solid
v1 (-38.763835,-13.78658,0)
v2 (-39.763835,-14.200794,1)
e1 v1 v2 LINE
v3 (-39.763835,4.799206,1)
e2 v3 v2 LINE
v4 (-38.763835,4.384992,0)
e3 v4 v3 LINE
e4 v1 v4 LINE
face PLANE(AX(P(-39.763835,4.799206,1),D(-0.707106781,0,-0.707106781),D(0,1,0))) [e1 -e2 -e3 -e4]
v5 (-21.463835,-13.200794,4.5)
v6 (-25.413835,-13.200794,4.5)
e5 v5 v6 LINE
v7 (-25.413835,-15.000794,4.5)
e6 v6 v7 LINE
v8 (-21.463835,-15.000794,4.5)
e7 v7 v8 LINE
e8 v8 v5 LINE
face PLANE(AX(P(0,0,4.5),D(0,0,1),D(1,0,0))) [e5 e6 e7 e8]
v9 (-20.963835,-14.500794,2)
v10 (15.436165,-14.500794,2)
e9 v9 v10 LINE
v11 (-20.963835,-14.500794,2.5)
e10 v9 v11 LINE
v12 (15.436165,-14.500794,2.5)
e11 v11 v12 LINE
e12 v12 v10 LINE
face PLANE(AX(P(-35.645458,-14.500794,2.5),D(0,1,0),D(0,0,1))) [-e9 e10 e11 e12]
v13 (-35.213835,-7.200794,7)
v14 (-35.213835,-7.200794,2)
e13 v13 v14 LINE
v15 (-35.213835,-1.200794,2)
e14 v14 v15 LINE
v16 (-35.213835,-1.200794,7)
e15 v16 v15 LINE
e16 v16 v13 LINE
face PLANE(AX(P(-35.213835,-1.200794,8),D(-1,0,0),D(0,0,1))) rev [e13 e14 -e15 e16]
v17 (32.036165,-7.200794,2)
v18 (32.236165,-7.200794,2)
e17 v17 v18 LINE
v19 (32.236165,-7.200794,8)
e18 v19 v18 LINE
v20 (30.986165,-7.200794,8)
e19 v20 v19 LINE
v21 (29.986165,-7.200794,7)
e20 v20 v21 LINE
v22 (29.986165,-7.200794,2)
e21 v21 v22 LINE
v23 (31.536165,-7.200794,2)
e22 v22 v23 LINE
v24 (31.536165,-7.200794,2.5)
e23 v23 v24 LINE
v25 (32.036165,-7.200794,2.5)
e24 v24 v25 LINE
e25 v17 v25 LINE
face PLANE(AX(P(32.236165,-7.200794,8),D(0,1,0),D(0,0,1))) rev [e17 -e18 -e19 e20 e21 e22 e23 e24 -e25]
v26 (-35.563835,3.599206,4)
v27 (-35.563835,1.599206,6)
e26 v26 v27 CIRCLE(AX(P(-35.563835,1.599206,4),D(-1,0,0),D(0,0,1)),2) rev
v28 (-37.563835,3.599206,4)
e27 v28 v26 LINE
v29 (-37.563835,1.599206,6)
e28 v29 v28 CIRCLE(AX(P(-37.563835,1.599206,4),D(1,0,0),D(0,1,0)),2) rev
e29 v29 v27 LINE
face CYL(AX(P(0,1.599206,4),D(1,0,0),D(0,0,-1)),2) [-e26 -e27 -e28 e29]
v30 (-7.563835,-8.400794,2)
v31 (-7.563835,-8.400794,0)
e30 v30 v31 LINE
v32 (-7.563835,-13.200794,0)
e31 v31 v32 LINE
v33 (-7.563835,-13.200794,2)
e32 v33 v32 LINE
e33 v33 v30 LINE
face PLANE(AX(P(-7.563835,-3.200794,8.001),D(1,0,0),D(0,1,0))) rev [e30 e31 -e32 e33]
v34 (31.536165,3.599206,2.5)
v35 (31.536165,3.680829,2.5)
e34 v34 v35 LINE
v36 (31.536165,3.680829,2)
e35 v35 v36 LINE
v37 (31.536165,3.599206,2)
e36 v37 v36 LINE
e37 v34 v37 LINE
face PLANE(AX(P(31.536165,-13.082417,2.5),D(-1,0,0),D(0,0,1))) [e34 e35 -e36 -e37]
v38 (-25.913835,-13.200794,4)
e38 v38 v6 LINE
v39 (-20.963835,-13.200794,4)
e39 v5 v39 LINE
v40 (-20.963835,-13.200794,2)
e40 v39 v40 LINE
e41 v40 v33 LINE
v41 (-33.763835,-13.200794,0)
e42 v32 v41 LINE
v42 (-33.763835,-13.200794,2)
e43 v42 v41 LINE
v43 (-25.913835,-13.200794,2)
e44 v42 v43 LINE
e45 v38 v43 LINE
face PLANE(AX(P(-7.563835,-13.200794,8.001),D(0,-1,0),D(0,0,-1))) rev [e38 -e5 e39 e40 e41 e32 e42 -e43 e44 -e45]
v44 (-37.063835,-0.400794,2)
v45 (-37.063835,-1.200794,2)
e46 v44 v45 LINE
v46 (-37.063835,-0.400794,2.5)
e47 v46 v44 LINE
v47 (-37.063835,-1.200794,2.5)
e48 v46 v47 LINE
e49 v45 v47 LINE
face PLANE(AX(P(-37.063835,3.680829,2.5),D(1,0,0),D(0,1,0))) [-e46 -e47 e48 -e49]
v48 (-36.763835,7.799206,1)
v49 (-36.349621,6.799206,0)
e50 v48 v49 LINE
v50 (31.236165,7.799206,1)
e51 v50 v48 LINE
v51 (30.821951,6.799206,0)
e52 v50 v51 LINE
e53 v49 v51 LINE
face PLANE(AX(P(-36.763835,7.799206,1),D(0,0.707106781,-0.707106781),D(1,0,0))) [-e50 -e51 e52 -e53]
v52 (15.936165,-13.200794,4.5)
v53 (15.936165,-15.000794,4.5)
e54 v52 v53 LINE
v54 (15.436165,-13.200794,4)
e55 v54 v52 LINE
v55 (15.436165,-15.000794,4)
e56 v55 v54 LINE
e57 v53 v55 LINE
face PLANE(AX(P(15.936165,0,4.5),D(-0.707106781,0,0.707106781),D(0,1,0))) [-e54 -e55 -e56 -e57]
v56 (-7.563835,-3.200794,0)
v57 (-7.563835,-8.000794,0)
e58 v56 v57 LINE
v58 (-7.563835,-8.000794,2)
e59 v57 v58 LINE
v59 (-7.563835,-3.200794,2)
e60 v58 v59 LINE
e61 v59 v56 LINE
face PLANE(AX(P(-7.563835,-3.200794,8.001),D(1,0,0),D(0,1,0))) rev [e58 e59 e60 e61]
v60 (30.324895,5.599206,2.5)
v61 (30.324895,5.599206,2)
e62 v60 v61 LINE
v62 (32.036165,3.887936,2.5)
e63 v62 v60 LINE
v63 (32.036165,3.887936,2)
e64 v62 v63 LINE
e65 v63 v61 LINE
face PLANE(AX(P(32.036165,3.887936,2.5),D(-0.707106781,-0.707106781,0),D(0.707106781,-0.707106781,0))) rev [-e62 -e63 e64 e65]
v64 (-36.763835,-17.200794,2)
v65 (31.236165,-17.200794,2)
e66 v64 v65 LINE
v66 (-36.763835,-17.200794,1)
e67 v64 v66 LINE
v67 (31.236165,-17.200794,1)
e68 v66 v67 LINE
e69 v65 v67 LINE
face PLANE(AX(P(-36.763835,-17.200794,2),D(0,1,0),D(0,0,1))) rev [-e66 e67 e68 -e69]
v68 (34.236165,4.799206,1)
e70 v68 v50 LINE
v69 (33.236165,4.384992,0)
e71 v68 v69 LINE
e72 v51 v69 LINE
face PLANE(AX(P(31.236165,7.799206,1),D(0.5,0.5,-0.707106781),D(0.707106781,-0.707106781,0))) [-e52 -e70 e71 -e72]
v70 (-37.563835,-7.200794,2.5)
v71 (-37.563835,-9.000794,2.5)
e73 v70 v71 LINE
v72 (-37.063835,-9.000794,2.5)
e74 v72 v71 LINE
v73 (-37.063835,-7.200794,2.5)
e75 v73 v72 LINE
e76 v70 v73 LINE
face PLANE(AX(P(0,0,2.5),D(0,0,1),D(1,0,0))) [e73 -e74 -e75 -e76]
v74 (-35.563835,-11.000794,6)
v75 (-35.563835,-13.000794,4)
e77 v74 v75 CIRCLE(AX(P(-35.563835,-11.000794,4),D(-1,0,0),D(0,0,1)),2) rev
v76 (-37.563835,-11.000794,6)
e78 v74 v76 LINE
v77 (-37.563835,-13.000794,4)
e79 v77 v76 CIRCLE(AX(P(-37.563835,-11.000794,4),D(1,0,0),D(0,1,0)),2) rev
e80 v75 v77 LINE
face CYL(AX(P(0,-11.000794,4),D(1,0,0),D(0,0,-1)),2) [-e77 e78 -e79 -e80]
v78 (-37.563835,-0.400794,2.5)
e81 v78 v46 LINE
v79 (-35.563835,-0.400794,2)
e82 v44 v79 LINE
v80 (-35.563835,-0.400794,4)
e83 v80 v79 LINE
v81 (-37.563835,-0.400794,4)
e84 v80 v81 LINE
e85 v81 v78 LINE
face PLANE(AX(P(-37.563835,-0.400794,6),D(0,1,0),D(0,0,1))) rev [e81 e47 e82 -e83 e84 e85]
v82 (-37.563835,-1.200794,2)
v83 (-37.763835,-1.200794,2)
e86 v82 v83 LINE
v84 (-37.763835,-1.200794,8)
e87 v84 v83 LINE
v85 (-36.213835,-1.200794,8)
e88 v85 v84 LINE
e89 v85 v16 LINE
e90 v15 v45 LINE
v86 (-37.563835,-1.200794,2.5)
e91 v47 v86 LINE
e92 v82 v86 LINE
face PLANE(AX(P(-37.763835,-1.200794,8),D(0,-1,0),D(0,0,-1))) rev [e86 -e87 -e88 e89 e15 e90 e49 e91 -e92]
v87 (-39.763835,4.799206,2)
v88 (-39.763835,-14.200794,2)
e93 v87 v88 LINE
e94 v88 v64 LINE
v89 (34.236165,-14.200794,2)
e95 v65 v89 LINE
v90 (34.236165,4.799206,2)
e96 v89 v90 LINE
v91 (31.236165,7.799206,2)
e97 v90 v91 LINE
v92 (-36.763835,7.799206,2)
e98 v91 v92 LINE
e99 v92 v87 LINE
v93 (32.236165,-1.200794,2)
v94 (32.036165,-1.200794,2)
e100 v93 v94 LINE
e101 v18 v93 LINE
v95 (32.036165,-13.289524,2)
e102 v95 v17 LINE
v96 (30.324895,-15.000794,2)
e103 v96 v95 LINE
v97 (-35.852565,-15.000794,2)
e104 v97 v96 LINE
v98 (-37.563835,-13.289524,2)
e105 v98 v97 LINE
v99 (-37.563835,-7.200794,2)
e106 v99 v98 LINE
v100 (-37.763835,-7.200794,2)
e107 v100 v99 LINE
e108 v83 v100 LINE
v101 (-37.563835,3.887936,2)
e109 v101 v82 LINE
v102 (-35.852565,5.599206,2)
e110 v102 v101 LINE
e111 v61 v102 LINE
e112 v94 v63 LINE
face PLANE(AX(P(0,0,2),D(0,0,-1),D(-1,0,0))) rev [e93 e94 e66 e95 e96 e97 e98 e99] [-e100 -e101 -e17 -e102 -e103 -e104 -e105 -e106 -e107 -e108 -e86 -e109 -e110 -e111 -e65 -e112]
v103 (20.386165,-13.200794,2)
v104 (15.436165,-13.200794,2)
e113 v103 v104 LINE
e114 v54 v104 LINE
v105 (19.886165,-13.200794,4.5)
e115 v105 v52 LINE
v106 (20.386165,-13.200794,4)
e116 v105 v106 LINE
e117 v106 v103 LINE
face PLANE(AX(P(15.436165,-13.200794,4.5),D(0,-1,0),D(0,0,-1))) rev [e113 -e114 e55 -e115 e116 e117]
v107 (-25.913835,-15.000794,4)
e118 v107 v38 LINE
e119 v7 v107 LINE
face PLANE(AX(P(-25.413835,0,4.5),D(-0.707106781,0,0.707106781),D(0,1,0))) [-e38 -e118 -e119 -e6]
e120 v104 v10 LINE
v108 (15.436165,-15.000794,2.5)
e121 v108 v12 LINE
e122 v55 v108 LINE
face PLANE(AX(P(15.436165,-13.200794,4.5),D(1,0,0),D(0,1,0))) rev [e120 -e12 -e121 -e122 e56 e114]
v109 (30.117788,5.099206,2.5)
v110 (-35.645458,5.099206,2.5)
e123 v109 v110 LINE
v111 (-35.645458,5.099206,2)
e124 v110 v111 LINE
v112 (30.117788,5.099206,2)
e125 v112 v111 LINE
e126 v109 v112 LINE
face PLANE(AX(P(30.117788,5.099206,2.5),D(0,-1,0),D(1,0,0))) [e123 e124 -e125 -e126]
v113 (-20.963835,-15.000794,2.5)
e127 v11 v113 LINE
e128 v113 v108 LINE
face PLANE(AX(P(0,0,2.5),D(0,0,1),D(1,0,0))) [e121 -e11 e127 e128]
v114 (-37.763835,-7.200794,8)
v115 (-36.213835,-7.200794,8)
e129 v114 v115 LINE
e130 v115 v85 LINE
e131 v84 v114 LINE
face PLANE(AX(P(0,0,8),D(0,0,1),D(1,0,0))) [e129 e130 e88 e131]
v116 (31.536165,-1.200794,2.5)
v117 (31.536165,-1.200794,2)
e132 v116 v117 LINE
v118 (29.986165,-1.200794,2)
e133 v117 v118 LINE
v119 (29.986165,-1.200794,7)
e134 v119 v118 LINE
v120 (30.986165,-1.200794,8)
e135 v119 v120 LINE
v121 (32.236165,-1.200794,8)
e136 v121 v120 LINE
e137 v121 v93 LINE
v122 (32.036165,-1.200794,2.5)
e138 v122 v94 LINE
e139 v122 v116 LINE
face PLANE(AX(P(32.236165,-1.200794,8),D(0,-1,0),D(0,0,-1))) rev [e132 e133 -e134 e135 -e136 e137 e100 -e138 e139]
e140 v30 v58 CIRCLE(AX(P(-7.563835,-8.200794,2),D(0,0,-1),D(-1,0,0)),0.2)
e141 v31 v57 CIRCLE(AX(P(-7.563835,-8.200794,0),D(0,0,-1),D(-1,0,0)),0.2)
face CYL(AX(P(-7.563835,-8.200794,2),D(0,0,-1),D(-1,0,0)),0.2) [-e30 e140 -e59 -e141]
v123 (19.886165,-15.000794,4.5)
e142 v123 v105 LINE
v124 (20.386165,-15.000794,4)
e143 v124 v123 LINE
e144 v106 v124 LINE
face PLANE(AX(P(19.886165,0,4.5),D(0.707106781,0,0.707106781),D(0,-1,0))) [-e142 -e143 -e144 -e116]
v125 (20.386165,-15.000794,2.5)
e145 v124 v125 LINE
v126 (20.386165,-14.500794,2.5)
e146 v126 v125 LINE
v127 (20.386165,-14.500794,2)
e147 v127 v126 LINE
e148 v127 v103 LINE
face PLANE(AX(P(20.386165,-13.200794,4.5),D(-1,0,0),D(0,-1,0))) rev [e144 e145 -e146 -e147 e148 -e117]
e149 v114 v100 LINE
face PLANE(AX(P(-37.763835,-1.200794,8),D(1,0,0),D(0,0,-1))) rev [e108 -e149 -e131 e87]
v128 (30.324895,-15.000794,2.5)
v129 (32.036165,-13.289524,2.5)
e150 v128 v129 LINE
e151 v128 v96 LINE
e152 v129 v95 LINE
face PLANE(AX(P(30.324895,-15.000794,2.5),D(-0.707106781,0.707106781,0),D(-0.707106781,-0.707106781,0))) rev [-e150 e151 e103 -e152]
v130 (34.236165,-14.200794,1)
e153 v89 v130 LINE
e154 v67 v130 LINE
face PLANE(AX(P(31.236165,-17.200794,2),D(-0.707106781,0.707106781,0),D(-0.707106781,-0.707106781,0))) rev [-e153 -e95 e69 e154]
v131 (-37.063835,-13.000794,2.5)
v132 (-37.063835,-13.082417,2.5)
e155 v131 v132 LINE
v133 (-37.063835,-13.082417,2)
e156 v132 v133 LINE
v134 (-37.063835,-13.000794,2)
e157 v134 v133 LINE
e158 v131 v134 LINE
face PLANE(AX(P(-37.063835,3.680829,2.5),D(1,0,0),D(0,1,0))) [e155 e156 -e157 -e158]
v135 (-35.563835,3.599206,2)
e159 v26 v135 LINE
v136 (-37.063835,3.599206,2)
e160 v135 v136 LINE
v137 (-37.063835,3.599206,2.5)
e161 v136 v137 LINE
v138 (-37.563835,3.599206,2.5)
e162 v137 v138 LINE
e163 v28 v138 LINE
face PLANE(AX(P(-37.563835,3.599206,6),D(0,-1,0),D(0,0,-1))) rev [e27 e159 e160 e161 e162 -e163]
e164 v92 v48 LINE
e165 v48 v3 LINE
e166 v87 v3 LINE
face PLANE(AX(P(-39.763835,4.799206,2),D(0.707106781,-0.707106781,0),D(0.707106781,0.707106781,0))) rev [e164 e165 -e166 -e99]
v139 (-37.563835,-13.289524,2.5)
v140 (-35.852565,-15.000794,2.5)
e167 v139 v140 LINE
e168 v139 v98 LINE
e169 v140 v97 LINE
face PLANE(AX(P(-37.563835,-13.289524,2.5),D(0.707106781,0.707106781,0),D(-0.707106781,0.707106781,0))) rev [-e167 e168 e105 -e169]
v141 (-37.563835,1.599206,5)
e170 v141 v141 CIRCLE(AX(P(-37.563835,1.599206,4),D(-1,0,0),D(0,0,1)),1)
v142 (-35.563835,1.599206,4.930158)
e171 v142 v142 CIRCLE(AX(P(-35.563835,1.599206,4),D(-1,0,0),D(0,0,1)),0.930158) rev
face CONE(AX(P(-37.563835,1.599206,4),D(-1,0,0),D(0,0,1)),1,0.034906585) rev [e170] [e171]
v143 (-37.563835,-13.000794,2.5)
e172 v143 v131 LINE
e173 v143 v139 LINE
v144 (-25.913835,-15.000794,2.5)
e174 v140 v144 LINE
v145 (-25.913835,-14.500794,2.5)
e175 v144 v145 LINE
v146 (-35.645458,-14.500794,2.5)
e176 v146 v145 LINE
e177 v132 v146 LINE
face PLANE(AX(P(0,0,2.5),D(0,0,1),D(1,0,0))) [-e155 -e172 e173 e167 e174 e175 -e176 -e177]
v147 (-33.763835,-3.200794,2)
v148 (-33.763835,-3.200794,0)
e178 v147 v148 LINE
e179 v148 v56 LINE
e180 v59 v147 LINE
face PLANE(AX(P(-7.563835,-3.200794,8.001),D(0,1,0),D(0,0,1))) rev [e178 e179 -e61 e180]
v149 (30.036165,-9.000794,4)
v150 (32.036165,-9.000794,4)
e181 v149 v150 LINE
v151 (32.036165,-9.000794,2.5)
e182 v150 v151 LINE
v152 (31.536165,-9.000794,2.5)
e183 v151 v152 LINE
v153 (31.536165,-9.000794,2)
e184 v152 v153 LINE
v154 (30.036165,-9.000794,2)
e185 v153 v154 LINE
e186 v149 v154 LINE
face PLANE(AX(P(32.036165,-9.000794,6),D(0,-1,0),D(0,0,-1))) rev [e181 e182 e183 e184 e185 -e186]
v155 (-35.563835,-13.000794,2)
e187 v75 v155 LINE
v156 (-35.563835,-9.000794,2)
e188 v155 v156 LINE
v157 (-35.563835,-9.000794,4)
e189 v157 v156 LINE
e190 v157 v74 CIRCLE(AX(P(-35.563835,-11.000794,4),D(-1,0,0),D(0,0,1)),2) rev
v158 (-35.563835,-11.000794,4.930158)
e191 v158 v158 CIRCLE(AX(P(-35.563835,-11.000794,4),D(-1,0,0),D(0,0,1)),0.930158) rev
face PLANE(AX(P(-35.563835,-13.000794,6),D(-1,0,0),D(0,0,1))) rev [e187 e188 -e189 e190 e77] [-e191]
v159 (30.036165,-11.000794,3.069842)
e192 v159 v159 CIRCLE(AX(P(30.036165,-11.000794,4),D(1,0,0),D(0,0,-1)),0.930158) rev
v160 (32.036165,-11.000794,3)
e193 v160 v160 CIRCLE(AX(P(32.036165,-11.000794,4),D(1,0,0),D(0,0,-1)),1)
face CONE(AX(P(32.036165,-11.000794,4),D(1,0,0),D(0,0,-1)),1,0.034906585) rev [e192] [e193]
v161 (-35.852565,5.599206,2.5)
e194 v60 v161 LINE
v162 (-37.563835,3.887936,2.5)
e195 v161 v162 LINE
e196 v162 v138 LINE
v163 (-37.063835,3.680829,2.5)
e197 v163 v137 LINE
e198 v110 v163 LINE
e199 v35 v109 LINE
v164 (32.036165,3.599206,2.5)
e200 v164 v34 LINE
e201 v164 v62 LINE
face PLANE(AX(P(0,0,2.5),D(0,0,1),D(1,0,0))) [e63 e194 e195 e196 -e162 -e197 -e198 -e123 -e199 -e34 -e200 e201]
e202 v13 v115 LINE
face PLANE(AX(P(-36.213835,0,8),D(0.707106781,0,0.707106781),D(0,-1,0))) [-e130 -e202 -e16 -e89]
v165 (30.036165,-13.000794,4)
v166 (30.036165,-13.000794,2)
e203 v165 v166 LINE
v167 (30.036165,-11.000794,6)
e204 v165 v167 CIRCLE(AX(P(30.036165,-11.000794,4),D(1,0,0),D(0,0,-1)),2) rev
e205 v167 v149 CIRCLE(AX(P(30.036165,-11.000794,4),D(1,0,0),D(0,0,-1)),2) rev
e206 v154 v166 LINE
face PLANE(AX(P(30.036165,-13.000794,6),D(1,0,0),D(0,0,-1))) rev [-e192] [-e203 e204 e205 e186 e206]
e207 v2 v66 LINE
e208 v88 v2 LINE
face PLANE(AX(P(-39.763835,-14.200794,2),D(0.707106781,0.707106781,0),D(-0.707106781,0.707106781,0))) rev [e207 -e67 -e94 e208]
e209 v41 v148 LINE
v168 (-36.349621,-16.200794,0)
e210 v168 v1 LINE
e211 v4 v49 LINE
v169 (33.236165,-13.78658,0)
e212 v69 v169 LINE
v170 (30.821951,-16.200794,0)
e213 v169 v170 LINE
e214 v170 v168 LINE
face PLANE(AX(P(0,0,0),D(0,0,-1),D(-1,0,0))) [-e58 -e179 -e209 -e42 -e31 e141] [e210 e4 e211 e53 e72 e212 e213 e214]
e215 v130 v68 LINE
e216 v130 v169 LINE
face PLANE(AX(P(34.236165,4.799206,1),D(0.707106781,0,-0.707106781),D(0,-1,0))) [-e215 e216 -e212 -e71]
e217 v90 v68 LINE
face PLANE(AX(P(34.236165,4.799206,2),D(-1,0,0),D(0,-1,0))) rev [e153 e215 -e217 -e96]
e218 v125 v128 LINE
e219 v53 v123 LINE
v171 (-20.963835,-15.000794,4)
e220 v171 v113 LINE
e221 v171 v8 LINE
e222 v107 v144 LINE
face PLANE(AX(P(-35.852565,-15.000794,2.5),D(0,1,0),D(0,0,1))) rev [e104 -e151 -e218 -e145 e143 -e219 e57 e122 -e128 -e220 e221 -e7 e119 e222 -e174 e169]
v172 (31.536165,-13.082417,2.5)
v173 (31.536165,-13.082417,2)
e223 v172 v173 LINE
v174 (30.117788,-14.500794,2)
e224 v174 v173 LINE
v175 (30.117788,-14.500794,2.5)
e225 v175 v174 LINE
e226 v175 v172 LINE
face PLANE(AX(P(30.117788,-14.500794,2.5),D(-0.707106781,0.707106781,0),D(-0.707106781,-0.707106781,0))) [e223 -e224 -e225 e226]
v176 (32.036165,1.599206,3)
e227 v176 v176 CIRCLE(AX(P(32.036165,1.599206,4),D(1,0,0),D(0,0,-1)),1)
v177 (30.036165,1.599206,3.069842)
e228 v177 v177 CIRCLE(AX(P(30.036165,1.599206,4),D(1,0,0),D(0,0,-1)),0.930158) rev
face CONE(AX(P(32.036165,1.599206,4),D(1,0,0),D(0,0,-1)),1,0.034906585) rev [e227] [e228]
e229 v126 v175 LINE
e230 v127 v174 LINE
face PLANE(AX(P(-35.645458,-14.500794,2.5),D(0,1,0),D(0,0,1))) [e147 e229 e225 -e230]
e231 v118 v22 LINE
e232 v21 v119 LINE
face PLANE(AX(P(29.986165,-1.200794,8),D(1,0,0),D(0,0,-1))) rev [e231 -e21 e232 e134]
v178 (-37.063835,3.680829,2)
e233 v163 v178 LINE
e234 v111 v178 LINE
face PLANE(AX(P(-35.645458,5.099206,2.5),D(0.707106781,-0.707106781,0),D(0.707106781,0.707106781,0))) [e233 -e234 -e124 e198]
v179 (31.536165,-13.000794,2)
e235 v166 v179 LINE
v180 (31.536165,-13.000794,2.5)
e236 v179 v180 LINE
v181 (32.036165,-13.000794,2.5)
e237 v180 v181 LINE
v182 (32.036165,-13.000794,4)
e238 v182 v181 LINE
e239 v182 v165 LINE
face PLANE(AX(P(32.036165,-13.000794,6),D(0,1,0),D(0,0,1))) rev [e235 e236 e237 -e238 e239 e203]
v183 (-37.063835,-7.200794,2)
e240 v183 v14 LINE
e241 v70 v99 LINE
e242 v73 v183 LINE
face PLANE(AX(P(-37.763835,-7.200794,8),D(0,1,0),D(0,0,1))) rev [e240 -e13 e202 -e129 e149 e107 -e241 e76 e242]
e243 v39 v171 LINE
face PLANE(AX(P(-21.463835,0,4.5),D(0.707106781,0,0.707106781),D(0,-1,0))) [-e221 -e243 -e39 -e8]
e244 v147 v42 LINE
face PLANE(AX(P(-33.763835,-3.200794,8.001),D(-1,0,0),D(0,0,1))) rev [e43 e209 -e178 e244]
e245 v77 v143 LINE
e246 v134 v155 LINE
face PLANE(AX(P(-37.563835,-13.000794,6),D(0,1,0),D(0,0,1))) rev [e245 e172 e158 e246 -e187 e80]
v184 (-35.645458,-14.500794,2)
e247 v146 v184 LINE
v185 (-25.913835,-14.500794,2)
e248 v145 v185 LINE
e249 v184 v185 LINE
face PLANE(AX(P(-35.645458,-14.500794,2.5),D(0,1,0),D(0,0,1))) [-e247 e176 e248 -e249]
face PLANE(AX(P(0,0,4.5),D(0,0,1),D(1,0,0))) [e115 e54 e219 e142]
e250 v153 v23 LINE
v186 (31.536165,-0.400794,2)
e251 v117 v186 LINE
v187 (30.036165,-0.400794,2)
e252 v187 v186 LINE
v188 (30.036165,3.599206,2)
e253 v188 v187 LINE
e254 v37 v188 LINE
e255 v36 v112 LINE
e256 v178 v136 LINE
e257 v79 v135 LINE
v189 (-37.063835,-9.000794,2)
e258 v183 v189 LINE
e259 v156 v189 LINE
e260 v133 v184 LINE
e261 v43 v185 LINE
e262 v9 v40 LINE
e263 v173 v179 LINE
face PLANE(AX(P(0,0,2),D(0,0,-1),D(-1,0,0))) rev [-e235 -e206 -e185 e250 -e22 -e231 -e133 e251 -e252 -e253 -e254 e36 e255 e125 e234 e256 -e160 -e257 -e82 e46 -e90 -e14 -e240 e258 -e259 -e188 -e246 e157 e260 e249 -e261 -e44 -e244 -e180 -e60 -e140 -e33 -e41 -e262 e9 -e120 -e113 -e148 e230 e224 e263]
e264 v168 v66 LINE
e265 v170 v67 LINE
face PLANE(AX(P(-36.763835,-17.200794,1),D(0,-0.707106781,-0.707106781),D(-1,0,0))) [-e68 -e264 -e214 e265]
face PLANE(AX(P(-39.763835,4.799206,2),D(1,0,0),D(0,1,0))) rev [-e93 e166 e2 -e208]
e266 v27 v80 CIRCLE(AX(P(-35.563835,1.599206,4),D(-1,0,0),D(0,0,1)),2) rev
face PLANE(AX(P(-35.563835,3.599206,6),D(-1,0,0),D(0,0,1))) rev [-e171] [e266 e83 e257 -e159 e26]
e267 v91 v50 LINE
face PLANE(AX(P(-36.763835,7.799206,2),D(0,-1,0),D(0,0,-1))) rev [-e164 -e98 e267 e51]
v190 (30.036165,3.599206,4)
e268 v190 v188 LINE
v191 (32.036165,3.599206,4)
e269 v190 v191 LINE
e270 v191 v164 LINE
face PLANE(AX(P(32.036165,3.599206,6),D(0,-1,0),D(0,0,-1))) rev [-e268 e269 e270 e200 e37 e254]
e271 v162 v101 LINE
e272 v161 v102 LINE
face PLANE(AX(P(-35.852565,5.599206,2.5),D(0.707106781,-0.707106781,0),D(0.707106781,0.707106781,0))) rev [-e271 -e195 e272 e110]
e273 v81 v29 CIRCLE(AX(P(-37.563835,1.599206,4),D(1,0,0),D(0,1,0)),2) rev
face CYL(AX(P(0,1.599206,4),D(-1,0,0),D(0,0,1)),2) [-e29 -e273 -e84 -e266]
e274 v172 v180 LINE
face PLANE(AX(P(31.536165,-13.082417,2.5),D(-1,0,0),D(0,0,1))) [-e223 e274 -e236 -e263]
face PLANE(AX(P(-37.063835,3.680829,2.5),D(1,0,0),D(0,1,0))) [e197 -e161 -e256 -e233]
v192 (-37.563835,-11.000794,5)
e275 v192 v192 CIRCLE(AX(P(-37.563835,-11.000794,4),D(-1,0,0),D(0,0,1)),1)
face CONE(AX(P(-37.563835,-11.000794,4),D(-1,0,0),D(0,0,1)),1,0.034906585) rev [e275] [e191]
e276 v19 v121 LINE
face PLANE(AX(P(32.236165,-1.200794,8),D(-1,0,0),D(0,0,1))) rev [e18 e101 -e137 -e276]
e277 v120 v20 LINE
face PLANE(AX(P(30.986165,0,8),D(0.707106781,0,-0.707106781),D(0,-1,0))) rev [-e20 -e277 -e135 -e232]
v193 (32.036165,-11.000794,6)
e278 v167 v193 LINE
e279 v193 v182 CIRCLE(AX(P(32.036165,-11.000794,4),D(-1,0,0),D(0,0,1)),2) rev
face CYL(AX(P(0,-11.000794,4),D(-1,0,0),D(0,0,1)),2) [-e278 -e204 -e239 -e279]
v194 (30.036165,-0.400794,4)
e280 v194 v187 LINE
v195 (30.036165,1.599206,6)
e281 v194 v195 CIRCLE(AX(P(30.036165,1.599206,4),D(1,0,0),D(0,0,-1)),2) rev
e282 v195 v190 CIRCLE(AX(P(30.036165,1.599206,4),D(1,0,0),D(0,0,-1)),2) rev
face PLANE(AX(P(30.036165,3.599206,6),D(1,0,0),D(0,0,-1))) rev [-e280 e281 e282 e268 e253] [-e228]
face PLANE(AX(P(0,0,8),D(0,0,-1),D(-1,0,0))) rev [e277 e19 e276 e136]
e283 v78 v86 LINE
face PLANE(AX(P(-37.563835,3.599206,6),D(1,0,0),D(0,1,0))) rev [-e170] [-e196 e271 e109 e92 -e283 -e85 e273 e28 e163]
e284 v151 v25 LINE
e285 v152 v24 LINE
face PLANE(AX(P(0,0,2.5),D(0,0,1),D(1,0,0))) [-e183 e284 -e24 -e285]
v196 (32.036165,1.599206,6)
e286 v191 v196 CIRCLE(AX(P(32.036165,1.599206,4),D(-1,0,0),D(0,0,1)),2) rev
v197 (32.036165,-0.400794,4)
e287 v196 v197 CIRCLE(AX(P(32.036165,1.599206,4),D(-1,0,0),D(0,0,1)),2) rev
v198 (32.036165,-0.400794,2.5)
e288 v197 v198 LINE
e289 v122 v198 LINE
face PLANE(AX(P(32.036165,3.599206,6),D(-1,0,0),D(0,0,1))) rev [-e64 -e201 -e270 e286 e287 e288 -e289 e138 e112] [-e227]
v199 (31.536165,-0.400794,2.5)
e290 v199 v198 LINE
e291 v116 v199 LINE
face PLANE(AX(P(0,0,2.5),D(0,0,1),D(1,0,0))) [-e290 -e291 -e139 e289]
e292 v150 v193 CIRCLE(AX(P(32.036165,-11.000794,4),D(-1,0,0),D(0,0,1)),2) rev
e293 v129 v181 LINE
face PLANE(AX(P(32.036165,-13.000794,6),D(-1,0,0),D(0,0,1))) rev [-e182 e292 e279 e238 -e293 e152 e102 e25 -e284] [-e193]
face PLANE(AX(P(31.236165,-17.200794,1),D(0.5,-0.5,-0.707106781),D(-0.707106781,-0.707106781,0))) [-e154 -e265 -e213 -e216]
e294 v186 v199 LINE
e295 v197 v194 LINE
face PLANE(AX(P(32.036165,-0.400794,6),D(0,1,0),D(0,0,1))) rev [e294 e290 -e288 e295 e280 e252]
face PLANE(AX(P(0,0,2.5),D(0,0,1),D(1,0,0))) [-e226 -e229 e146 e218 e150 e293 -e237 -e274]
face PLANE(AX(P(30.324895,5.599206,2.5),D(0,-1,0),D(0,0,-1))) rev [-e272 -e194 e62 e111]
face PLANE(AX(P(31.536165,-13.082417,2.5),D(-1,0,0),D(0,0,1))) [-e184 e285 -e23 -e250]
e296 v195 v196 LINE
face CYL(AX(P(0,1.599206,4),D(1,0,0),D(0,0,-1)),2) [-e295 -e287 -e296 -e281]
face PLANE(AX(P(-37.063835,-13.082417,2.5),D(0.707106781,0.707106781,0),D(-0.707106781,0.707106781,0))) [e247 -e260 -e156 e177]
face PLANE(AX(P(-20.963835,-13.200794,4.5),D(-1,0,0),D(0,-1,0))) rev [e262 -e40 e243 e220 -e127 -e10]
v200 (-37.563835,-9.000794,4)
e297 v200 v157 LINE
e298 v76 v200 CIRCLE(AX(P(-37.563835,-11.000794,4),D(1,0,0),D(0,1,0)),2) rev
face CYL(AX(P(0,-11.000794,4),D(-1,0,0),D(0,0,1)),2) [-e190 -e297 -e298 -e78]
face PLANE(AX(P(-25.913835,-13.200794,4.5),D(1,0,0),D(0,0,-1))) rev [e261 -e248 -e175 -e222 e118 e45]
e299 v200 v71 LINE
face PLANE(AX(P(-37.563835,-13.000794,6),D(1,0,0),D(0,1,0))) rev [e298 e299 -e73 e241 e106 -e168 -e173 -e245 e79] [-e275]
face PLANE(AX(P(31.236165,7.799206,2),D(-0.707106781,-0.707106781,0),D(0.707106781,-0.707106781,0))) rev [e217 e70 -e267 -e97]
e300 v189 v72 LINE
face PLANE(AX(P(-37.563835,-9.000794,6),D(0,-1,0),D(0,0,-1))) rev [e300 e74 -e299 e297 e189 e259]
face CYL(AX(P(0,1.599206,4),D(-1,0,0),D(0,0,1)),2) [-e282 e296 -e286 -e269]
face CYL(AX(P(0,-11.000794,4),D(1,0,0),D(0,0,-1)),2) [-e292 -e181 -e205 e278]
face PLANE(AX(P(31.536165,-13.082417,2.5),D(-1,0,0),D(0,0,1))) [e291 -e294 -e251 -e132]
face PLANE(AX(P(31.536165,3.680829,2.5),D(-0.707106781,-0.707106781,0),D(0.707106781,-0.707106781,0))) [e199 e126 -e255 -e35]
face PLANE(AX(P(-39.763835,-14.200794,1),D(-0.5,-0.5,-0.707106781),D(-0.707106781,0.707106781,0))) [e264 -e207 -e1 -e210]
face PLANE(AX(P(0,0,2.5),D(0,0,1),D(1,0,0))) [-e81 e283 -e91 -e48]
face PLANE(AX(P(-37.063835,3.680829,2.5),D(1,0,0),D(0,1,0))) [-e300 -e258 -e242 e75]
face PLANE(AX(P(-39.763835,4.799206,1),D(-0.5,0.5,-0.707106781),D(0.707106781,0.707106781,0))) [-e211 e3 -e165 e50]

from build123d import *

# Parameters (mm, degrees)
EXTRUDE_1_DEPTH               = 2
CHAMFER_1_SIZE                = 1
SKETCH_3_W                    = 2
SKETCH_3_H                    = 4
EXTRUDE_2_DEPTH               = 4
FILLET_1_R                    = 2
SKETCH_4_R                    = 1
CUT_EXTRUDE_1_DEPTH           = 2
CUT_EXTRUDE_1_DRAFT           = -2
CUT_EXTRUDE_1_PROFILE_2_DEPTH = 2
CUT_EXTRUDE_1_PROFILE_2_DRAFT = -2
SKETCH_5_R                    = 1
CUT_EXTRUDE_2_DEPTH           = 2
CUT_EXTRUDE_2_DRAFT           = -2
CUT_EXTRUDE_2_PROFILE_2_DEPTH = 2
CUT_EXTRUDE_2_PROFILE_2_DRAFT = -2
SKETCH_8_W                    = 2.55
SKETCH_8_H                    = 6
SKETCH_8_W_2                  = 2.25
EXTRUDE_5_DEPTH               = 6
CHAMFER_3_SIZE                = 1
CUT_EXTRUDE_3_REACH           = 46.057
SKETCH_10_W                   = 26.2
SKETCH_10_H                   = 10
EXTRUDE_7_DEPTH               = 0.5
SKETCH_12_W                   = 4.95
SKETCH_12_H                   = 1.8
EXTRUDE_8_DEPTH               = 2.5
CHAMFER_4_SIZE                = 0.5
SKETCH_13_R                   = 0.2
EXTRUDE_9_DEPTH               = 2


with BuildPart() as part:
    # 草图1 → 凸台-拉伸1 (new body)
    with BuildSketch(Plane.XY):
        Polygon((-39.76383505, 4.799206062), (-36.76383505, 7.799206062), (31.23616495, 7.799206062), (34.23616495, 4.799206062), (34.23616495, -14.200793938), (31.23616495, -17.200793938), (-36.76383505, -17.200793938), (-39.76383505, -14.200793938), align=None)
    extrude(amount=EXTRUDE_1_DEPTH)

    # 倒角1
    chamfer_1_edges = [part.edges().sort_by_distance(p)[0] for p in [
        (-38.26383505, -15.700793938, 0),
        (-39.76383505, -4.700793938, 0),
        (-38.26383505, 6.299206062, 0),
        (-2.76383505, 7.799206062, 0),
        (32.73616495, 6.299206062, 0),
        (34.23616495, -4.700793938, 0),
        (32.73616495, -15.700793938, 0),
        (-2.76383505, -17.200793938, 0),
    ]]
    chamfer(chamfer_1_edges, length=CHAMFER_1_SIZE)

    # 草图3 → 凸台-拉伸2 (add)
    with BuildSketch(Plane.XY.offset(2)):
        with Locations((-36.56383505, 1.599206062)):
            Rectangle(SKETCH_3_W, SKETCH_3_H)
        with Locations((-36.56383505, -11.000793938)):
            Rectangle(SKETCH_3_W, SKETCH_3_H)
        with Locations((31.03616495, 1.599206062)):
            Rectangle(SKETCH_3_W, SKETCH_3_H)
        with Locations((31.03616495, -11.000793938)):
            Rectangle(SKETCH_3_W, SKETCH_3_H)
    extrude(amount=EXTRUDE_2_DEPTH)

    # 圆角1
    fillet_1_edges = [part.edges().sort_by_distance(p)[0] for p in [
        (31.03616495, 3.599206062, 6),
        (31.03616495, -0.400793938, 6),
        (31.03616495, -9.000793938, 6),
        (31.03616495, -13.000793938, 6),
        (-36.56383505, -13.000793938, 6),
        (-36.56383505, -9.000793938, 6),
        (-36.56383505, 3.599206062, 6),
        (-36.56383505, -0.400793938, 6),
    ]]
    fillet(fillet_1_edges, radius=FILLET_1_R - 0.0001)  # a hair under: the kernel refuses the full size


with BuildPart() as cut_extrude_1_tool:
    # 草图4 → 切除-拉伸1 (with draft: the straight prism first)
    with BuildSketch(Plane(origin=(32.03616495, 0, 0), x_dir=(0, 0, -1), z_dir=(1, 0, 0))):
        with Locations((-4, 1.599206062)):
            Circle(SKETCH_4_R)
    extrude(amount=-CUT_EXTRUDE_1_DEPTH)
    # 切除-拉伸1: the draft: its side faces are tilted about the plane it starts from
    cut_extrude_1_sides = [cut_extrude_1_tool.faces().sort_by_distance(p)[0] for p in [
        (31.03616495, 1.599206062, 5),
    ]]
    draft(cut_extrude_1_sides, Plane(origin=(32.03616495, 0, 0), x_dir=(0, 0, -1), z_dir=(1, 0, 0)), CUT_EXTRUDE_1_DRAFT)


with BuildPart() as part_1:
    add(part.part)

    # 切除-拉伸1: cut by cut_extrude_1_tool
    add(cut_extrude_1_tool.part, mode=Mode.SUBTRACT)


with BuildPart() as cut_extrude_1_profile_2_tool:
    # 草图4 → 切除-拉伸1 profile 2 (with draft: the straight prism first)
    with BuildSketch(Plane(origin=(32.03616495, 0, 0), x_dir=(0, 0, -1), z_dir=(1, 0, 0))):
        with Locations((-4, -11.000793938)):
            Circle(SKETCH_4_R)
    extrude(amount=-CUT_EXTRUDE_1_PROFILE_2_DEPTH)
    # 切除-拉伸1 profile 2: the draft: its side faces are tilted about the plane it starts from
    cut_extrude_1_profile_2_sides = [cut_extrude_1_profile_2_tool.faces().sort_by_distance(p)[0] for p in [
        (31.03616495, -11.000793938, 5),
    ]]
    draft(cut_extrude_1_profile_2_sides, Plane(origin=(32.03616495, 0, 0), x_dir=(0, 0, -1), z_dir=(1, 0, 0)), CUT_EXTRUDE_1_PROFILE_2_DRAFT)


with BuildPart() as part_2:
    add(part_1.part)

    # 切除-拉伸1 profile 2: cut by cut_extrude_1_profile_2_tool
    add(cut_extrude_1_profile_2_tool.part, mode=Mode.SUBTRACT)


with BuildPart() as cut_extrude_2_tool:
    # 草图5 → 切除-拉伸2 (with draft: the straight prism first)
    with BuildSketch(Plane.ZY.offset(37.56383505)):
        with Locations((4, 1.599206062)):
            Circle(SKETCH_5_R)
    extrude(amount=-CUT_EXTRUDE_2_DEPTH)
    # 切除-拉伸2: the draft: its side faces are tilted about the plane it starts from
    cut_extrude_2_sides = [cut_extrude_2_tool.faces().sort_by_distance(p)[0] for p in [
        (-36.56383505, 1.599206062, 3),
    ]]
    draft(cut_extrude_2_sides, Plane.ZY.offset(37.56383505), CUT_EXTRUDE_2_DRAFT)


with BuildPart() as part_3:
    add(part_2.part)

    # 切除-拉伸2: cut by cut_extrude_2_tool
    add(cut_extrude_2_tool.part, mode=Mode.SUBTRACT)


with BuildPart() as cut_extrude_2_profile_2_tool:
    # 草图5 → 切除-拉伸2 profile 2 (with draft: the straight prism first)
    with BuildSketch(Plane.ZY.offset(37.56383505)):
        with Locations((4, -11.000793938)):
            Circle(SKETCH_5_R)
    extrude(amount=-CUT_EXTRUDE_2_PROFILE_2_DEPTH)
    # 切除-拉伸2 profile 2: the draft: its side faces are tilted about the plane it starts from
    cut_extrude_2_profile_2_sides = [cut_extrude_2_profile_2_tool.faces().sort_by_distance(p)[0] for p in [
        (-36.56383505, -11.000793938, 3),
    ]]
    draft(cut_extrude_2_profile_2_sides, Plane.ZY.offset(37.56383505), CUT_EXTRUDE_2_PROFILE_2_DRAFT)


with BuildPart() as part_4:
    add(part_3.part)

    # 切除-拉伸2 profile 2: cut by cut_extrude_2_profile_2_tool
    add(cut_extrude_2_profile_2_tool.part, mode=Mode.SUBTRACT)

    # 草图8 → 凸台-拉伸5 (add)
    with BuildSketch(Plane.XY.offset(2)):
        with Locations((-36.48883505, -4.200793938)):
            Rectangle(SKETCH_8_W, SKETCH_8_H)
        with Locations((31.11116495, -4.200793938)):
            Rectangle(SKETCH_8_W_2, SKETCH_8_H)
    extrude(amount=EXTRUDE_5_DEPTH)

    # 倒角3
    chamfer_3_edges = [part_4.edges().sort_by_distance(p)[0] for p in [
        (-35.21383505, -4.200793938, 8),
        (29.98616495, -4.200793938, 8),
    ]]
    chamfer(chamfer_3_edges, length=CHAMFER_3_SIZE)

    # 草图10 → 切除-拉伸3 (cut, up to next)
    with BuildSketch(Plane(origin=(0, 0, 0), x_dir=(-1, 0, 0), z_dir=(0, 0, -1)), mode=Mode.PRIVATE) as cut_extrude_3_sk1:
        with Locations((20.66383505, -8.200793938)):
            Rectangle(SKETCH_10_W, SKETCH_10_H)
    cut_extrude_3_tool1 = extrude(cut_extrude_3_sk1.sketch, amount=-CUT_EXTRUDE_3_REACH, mode=Mode.PRIVATE) & part_4.part
    add(cut_extrude_3_tool1.solids().sort_by_distance((-20.663835, -8.200794, 0))[0], mode=Mode.SUBTRACT)

    # 草图11 → 凸台-拉伸7 (add)
    with BuildSketch(Plane.XY.offset(2)):
        Polygon((30.324895113, 5.599206062), (-35.852565213, 5.599206062), (-37.56383505, 3.887936224), (-37.56383505, -13.289524101), (-35.852565213, -15.000793938), (30.324895113, -15.000793938), (32.03616495, -13.289524101), (32.03616495, 3.887936224), align=None)
        Polygon((30.117788331, 5.099206062), (-35.645458432, 5.099206062), (-37.06383505, 3.680829443), (-37.06383505, -13.08241732), (-35.645458432, -14.500793938), (30.117788331, -14.500793938), (31.53616495, -13.08241732), (31.53616495, 3.680829443), align=None, mode=Mode.SUBTRACT)
    extrude(amount=EXTRUDE_7_DEPTH)

    # 草图12 → 凸台-拉伸8 (add)
    with BuildSketch(Plane.XY.offset(2)):
        with Locations((17.91116495, -14.100793938)):
            Rectangle(SKETCH_12_W, SKETCH_12_H)
        with Locations((-23.43883505, -14.100793938)):
            Rectangle(SKETCH_12_W, SKETCH_12_H)
    extrude(amount=EXTRUDE_8_DEPTH)

    # 倒角4
    chamfer_4_edges = [part_4.edges().sort_by_distance(p)[0] for p in [
        (15.43616495, -14.100793938, 4.5),
        (20.38616495, -14.100793938, 4.5),
        (-25.91383505, -14.100793938, 4.5),
        (-20.96383505, -14.100793938, 4.5),
    ]]
    chamfer(chamfer_4_edges, length=CHAMFER_4_SIZE)

    # 草图13 → 凸台-拉伸9 (add)
    with BuildSketch(Plane(origin=(0, 0, 0), x_dir=(-1, 0, 0), z_dir=(0, 0, -1))):
        with Locations((7.56383505, -8.200793938)):
            Circle(SKETCH_13_R)
    extrude(amount=-EXTRUDE_9_DEPTH)


solid = part_4.part
